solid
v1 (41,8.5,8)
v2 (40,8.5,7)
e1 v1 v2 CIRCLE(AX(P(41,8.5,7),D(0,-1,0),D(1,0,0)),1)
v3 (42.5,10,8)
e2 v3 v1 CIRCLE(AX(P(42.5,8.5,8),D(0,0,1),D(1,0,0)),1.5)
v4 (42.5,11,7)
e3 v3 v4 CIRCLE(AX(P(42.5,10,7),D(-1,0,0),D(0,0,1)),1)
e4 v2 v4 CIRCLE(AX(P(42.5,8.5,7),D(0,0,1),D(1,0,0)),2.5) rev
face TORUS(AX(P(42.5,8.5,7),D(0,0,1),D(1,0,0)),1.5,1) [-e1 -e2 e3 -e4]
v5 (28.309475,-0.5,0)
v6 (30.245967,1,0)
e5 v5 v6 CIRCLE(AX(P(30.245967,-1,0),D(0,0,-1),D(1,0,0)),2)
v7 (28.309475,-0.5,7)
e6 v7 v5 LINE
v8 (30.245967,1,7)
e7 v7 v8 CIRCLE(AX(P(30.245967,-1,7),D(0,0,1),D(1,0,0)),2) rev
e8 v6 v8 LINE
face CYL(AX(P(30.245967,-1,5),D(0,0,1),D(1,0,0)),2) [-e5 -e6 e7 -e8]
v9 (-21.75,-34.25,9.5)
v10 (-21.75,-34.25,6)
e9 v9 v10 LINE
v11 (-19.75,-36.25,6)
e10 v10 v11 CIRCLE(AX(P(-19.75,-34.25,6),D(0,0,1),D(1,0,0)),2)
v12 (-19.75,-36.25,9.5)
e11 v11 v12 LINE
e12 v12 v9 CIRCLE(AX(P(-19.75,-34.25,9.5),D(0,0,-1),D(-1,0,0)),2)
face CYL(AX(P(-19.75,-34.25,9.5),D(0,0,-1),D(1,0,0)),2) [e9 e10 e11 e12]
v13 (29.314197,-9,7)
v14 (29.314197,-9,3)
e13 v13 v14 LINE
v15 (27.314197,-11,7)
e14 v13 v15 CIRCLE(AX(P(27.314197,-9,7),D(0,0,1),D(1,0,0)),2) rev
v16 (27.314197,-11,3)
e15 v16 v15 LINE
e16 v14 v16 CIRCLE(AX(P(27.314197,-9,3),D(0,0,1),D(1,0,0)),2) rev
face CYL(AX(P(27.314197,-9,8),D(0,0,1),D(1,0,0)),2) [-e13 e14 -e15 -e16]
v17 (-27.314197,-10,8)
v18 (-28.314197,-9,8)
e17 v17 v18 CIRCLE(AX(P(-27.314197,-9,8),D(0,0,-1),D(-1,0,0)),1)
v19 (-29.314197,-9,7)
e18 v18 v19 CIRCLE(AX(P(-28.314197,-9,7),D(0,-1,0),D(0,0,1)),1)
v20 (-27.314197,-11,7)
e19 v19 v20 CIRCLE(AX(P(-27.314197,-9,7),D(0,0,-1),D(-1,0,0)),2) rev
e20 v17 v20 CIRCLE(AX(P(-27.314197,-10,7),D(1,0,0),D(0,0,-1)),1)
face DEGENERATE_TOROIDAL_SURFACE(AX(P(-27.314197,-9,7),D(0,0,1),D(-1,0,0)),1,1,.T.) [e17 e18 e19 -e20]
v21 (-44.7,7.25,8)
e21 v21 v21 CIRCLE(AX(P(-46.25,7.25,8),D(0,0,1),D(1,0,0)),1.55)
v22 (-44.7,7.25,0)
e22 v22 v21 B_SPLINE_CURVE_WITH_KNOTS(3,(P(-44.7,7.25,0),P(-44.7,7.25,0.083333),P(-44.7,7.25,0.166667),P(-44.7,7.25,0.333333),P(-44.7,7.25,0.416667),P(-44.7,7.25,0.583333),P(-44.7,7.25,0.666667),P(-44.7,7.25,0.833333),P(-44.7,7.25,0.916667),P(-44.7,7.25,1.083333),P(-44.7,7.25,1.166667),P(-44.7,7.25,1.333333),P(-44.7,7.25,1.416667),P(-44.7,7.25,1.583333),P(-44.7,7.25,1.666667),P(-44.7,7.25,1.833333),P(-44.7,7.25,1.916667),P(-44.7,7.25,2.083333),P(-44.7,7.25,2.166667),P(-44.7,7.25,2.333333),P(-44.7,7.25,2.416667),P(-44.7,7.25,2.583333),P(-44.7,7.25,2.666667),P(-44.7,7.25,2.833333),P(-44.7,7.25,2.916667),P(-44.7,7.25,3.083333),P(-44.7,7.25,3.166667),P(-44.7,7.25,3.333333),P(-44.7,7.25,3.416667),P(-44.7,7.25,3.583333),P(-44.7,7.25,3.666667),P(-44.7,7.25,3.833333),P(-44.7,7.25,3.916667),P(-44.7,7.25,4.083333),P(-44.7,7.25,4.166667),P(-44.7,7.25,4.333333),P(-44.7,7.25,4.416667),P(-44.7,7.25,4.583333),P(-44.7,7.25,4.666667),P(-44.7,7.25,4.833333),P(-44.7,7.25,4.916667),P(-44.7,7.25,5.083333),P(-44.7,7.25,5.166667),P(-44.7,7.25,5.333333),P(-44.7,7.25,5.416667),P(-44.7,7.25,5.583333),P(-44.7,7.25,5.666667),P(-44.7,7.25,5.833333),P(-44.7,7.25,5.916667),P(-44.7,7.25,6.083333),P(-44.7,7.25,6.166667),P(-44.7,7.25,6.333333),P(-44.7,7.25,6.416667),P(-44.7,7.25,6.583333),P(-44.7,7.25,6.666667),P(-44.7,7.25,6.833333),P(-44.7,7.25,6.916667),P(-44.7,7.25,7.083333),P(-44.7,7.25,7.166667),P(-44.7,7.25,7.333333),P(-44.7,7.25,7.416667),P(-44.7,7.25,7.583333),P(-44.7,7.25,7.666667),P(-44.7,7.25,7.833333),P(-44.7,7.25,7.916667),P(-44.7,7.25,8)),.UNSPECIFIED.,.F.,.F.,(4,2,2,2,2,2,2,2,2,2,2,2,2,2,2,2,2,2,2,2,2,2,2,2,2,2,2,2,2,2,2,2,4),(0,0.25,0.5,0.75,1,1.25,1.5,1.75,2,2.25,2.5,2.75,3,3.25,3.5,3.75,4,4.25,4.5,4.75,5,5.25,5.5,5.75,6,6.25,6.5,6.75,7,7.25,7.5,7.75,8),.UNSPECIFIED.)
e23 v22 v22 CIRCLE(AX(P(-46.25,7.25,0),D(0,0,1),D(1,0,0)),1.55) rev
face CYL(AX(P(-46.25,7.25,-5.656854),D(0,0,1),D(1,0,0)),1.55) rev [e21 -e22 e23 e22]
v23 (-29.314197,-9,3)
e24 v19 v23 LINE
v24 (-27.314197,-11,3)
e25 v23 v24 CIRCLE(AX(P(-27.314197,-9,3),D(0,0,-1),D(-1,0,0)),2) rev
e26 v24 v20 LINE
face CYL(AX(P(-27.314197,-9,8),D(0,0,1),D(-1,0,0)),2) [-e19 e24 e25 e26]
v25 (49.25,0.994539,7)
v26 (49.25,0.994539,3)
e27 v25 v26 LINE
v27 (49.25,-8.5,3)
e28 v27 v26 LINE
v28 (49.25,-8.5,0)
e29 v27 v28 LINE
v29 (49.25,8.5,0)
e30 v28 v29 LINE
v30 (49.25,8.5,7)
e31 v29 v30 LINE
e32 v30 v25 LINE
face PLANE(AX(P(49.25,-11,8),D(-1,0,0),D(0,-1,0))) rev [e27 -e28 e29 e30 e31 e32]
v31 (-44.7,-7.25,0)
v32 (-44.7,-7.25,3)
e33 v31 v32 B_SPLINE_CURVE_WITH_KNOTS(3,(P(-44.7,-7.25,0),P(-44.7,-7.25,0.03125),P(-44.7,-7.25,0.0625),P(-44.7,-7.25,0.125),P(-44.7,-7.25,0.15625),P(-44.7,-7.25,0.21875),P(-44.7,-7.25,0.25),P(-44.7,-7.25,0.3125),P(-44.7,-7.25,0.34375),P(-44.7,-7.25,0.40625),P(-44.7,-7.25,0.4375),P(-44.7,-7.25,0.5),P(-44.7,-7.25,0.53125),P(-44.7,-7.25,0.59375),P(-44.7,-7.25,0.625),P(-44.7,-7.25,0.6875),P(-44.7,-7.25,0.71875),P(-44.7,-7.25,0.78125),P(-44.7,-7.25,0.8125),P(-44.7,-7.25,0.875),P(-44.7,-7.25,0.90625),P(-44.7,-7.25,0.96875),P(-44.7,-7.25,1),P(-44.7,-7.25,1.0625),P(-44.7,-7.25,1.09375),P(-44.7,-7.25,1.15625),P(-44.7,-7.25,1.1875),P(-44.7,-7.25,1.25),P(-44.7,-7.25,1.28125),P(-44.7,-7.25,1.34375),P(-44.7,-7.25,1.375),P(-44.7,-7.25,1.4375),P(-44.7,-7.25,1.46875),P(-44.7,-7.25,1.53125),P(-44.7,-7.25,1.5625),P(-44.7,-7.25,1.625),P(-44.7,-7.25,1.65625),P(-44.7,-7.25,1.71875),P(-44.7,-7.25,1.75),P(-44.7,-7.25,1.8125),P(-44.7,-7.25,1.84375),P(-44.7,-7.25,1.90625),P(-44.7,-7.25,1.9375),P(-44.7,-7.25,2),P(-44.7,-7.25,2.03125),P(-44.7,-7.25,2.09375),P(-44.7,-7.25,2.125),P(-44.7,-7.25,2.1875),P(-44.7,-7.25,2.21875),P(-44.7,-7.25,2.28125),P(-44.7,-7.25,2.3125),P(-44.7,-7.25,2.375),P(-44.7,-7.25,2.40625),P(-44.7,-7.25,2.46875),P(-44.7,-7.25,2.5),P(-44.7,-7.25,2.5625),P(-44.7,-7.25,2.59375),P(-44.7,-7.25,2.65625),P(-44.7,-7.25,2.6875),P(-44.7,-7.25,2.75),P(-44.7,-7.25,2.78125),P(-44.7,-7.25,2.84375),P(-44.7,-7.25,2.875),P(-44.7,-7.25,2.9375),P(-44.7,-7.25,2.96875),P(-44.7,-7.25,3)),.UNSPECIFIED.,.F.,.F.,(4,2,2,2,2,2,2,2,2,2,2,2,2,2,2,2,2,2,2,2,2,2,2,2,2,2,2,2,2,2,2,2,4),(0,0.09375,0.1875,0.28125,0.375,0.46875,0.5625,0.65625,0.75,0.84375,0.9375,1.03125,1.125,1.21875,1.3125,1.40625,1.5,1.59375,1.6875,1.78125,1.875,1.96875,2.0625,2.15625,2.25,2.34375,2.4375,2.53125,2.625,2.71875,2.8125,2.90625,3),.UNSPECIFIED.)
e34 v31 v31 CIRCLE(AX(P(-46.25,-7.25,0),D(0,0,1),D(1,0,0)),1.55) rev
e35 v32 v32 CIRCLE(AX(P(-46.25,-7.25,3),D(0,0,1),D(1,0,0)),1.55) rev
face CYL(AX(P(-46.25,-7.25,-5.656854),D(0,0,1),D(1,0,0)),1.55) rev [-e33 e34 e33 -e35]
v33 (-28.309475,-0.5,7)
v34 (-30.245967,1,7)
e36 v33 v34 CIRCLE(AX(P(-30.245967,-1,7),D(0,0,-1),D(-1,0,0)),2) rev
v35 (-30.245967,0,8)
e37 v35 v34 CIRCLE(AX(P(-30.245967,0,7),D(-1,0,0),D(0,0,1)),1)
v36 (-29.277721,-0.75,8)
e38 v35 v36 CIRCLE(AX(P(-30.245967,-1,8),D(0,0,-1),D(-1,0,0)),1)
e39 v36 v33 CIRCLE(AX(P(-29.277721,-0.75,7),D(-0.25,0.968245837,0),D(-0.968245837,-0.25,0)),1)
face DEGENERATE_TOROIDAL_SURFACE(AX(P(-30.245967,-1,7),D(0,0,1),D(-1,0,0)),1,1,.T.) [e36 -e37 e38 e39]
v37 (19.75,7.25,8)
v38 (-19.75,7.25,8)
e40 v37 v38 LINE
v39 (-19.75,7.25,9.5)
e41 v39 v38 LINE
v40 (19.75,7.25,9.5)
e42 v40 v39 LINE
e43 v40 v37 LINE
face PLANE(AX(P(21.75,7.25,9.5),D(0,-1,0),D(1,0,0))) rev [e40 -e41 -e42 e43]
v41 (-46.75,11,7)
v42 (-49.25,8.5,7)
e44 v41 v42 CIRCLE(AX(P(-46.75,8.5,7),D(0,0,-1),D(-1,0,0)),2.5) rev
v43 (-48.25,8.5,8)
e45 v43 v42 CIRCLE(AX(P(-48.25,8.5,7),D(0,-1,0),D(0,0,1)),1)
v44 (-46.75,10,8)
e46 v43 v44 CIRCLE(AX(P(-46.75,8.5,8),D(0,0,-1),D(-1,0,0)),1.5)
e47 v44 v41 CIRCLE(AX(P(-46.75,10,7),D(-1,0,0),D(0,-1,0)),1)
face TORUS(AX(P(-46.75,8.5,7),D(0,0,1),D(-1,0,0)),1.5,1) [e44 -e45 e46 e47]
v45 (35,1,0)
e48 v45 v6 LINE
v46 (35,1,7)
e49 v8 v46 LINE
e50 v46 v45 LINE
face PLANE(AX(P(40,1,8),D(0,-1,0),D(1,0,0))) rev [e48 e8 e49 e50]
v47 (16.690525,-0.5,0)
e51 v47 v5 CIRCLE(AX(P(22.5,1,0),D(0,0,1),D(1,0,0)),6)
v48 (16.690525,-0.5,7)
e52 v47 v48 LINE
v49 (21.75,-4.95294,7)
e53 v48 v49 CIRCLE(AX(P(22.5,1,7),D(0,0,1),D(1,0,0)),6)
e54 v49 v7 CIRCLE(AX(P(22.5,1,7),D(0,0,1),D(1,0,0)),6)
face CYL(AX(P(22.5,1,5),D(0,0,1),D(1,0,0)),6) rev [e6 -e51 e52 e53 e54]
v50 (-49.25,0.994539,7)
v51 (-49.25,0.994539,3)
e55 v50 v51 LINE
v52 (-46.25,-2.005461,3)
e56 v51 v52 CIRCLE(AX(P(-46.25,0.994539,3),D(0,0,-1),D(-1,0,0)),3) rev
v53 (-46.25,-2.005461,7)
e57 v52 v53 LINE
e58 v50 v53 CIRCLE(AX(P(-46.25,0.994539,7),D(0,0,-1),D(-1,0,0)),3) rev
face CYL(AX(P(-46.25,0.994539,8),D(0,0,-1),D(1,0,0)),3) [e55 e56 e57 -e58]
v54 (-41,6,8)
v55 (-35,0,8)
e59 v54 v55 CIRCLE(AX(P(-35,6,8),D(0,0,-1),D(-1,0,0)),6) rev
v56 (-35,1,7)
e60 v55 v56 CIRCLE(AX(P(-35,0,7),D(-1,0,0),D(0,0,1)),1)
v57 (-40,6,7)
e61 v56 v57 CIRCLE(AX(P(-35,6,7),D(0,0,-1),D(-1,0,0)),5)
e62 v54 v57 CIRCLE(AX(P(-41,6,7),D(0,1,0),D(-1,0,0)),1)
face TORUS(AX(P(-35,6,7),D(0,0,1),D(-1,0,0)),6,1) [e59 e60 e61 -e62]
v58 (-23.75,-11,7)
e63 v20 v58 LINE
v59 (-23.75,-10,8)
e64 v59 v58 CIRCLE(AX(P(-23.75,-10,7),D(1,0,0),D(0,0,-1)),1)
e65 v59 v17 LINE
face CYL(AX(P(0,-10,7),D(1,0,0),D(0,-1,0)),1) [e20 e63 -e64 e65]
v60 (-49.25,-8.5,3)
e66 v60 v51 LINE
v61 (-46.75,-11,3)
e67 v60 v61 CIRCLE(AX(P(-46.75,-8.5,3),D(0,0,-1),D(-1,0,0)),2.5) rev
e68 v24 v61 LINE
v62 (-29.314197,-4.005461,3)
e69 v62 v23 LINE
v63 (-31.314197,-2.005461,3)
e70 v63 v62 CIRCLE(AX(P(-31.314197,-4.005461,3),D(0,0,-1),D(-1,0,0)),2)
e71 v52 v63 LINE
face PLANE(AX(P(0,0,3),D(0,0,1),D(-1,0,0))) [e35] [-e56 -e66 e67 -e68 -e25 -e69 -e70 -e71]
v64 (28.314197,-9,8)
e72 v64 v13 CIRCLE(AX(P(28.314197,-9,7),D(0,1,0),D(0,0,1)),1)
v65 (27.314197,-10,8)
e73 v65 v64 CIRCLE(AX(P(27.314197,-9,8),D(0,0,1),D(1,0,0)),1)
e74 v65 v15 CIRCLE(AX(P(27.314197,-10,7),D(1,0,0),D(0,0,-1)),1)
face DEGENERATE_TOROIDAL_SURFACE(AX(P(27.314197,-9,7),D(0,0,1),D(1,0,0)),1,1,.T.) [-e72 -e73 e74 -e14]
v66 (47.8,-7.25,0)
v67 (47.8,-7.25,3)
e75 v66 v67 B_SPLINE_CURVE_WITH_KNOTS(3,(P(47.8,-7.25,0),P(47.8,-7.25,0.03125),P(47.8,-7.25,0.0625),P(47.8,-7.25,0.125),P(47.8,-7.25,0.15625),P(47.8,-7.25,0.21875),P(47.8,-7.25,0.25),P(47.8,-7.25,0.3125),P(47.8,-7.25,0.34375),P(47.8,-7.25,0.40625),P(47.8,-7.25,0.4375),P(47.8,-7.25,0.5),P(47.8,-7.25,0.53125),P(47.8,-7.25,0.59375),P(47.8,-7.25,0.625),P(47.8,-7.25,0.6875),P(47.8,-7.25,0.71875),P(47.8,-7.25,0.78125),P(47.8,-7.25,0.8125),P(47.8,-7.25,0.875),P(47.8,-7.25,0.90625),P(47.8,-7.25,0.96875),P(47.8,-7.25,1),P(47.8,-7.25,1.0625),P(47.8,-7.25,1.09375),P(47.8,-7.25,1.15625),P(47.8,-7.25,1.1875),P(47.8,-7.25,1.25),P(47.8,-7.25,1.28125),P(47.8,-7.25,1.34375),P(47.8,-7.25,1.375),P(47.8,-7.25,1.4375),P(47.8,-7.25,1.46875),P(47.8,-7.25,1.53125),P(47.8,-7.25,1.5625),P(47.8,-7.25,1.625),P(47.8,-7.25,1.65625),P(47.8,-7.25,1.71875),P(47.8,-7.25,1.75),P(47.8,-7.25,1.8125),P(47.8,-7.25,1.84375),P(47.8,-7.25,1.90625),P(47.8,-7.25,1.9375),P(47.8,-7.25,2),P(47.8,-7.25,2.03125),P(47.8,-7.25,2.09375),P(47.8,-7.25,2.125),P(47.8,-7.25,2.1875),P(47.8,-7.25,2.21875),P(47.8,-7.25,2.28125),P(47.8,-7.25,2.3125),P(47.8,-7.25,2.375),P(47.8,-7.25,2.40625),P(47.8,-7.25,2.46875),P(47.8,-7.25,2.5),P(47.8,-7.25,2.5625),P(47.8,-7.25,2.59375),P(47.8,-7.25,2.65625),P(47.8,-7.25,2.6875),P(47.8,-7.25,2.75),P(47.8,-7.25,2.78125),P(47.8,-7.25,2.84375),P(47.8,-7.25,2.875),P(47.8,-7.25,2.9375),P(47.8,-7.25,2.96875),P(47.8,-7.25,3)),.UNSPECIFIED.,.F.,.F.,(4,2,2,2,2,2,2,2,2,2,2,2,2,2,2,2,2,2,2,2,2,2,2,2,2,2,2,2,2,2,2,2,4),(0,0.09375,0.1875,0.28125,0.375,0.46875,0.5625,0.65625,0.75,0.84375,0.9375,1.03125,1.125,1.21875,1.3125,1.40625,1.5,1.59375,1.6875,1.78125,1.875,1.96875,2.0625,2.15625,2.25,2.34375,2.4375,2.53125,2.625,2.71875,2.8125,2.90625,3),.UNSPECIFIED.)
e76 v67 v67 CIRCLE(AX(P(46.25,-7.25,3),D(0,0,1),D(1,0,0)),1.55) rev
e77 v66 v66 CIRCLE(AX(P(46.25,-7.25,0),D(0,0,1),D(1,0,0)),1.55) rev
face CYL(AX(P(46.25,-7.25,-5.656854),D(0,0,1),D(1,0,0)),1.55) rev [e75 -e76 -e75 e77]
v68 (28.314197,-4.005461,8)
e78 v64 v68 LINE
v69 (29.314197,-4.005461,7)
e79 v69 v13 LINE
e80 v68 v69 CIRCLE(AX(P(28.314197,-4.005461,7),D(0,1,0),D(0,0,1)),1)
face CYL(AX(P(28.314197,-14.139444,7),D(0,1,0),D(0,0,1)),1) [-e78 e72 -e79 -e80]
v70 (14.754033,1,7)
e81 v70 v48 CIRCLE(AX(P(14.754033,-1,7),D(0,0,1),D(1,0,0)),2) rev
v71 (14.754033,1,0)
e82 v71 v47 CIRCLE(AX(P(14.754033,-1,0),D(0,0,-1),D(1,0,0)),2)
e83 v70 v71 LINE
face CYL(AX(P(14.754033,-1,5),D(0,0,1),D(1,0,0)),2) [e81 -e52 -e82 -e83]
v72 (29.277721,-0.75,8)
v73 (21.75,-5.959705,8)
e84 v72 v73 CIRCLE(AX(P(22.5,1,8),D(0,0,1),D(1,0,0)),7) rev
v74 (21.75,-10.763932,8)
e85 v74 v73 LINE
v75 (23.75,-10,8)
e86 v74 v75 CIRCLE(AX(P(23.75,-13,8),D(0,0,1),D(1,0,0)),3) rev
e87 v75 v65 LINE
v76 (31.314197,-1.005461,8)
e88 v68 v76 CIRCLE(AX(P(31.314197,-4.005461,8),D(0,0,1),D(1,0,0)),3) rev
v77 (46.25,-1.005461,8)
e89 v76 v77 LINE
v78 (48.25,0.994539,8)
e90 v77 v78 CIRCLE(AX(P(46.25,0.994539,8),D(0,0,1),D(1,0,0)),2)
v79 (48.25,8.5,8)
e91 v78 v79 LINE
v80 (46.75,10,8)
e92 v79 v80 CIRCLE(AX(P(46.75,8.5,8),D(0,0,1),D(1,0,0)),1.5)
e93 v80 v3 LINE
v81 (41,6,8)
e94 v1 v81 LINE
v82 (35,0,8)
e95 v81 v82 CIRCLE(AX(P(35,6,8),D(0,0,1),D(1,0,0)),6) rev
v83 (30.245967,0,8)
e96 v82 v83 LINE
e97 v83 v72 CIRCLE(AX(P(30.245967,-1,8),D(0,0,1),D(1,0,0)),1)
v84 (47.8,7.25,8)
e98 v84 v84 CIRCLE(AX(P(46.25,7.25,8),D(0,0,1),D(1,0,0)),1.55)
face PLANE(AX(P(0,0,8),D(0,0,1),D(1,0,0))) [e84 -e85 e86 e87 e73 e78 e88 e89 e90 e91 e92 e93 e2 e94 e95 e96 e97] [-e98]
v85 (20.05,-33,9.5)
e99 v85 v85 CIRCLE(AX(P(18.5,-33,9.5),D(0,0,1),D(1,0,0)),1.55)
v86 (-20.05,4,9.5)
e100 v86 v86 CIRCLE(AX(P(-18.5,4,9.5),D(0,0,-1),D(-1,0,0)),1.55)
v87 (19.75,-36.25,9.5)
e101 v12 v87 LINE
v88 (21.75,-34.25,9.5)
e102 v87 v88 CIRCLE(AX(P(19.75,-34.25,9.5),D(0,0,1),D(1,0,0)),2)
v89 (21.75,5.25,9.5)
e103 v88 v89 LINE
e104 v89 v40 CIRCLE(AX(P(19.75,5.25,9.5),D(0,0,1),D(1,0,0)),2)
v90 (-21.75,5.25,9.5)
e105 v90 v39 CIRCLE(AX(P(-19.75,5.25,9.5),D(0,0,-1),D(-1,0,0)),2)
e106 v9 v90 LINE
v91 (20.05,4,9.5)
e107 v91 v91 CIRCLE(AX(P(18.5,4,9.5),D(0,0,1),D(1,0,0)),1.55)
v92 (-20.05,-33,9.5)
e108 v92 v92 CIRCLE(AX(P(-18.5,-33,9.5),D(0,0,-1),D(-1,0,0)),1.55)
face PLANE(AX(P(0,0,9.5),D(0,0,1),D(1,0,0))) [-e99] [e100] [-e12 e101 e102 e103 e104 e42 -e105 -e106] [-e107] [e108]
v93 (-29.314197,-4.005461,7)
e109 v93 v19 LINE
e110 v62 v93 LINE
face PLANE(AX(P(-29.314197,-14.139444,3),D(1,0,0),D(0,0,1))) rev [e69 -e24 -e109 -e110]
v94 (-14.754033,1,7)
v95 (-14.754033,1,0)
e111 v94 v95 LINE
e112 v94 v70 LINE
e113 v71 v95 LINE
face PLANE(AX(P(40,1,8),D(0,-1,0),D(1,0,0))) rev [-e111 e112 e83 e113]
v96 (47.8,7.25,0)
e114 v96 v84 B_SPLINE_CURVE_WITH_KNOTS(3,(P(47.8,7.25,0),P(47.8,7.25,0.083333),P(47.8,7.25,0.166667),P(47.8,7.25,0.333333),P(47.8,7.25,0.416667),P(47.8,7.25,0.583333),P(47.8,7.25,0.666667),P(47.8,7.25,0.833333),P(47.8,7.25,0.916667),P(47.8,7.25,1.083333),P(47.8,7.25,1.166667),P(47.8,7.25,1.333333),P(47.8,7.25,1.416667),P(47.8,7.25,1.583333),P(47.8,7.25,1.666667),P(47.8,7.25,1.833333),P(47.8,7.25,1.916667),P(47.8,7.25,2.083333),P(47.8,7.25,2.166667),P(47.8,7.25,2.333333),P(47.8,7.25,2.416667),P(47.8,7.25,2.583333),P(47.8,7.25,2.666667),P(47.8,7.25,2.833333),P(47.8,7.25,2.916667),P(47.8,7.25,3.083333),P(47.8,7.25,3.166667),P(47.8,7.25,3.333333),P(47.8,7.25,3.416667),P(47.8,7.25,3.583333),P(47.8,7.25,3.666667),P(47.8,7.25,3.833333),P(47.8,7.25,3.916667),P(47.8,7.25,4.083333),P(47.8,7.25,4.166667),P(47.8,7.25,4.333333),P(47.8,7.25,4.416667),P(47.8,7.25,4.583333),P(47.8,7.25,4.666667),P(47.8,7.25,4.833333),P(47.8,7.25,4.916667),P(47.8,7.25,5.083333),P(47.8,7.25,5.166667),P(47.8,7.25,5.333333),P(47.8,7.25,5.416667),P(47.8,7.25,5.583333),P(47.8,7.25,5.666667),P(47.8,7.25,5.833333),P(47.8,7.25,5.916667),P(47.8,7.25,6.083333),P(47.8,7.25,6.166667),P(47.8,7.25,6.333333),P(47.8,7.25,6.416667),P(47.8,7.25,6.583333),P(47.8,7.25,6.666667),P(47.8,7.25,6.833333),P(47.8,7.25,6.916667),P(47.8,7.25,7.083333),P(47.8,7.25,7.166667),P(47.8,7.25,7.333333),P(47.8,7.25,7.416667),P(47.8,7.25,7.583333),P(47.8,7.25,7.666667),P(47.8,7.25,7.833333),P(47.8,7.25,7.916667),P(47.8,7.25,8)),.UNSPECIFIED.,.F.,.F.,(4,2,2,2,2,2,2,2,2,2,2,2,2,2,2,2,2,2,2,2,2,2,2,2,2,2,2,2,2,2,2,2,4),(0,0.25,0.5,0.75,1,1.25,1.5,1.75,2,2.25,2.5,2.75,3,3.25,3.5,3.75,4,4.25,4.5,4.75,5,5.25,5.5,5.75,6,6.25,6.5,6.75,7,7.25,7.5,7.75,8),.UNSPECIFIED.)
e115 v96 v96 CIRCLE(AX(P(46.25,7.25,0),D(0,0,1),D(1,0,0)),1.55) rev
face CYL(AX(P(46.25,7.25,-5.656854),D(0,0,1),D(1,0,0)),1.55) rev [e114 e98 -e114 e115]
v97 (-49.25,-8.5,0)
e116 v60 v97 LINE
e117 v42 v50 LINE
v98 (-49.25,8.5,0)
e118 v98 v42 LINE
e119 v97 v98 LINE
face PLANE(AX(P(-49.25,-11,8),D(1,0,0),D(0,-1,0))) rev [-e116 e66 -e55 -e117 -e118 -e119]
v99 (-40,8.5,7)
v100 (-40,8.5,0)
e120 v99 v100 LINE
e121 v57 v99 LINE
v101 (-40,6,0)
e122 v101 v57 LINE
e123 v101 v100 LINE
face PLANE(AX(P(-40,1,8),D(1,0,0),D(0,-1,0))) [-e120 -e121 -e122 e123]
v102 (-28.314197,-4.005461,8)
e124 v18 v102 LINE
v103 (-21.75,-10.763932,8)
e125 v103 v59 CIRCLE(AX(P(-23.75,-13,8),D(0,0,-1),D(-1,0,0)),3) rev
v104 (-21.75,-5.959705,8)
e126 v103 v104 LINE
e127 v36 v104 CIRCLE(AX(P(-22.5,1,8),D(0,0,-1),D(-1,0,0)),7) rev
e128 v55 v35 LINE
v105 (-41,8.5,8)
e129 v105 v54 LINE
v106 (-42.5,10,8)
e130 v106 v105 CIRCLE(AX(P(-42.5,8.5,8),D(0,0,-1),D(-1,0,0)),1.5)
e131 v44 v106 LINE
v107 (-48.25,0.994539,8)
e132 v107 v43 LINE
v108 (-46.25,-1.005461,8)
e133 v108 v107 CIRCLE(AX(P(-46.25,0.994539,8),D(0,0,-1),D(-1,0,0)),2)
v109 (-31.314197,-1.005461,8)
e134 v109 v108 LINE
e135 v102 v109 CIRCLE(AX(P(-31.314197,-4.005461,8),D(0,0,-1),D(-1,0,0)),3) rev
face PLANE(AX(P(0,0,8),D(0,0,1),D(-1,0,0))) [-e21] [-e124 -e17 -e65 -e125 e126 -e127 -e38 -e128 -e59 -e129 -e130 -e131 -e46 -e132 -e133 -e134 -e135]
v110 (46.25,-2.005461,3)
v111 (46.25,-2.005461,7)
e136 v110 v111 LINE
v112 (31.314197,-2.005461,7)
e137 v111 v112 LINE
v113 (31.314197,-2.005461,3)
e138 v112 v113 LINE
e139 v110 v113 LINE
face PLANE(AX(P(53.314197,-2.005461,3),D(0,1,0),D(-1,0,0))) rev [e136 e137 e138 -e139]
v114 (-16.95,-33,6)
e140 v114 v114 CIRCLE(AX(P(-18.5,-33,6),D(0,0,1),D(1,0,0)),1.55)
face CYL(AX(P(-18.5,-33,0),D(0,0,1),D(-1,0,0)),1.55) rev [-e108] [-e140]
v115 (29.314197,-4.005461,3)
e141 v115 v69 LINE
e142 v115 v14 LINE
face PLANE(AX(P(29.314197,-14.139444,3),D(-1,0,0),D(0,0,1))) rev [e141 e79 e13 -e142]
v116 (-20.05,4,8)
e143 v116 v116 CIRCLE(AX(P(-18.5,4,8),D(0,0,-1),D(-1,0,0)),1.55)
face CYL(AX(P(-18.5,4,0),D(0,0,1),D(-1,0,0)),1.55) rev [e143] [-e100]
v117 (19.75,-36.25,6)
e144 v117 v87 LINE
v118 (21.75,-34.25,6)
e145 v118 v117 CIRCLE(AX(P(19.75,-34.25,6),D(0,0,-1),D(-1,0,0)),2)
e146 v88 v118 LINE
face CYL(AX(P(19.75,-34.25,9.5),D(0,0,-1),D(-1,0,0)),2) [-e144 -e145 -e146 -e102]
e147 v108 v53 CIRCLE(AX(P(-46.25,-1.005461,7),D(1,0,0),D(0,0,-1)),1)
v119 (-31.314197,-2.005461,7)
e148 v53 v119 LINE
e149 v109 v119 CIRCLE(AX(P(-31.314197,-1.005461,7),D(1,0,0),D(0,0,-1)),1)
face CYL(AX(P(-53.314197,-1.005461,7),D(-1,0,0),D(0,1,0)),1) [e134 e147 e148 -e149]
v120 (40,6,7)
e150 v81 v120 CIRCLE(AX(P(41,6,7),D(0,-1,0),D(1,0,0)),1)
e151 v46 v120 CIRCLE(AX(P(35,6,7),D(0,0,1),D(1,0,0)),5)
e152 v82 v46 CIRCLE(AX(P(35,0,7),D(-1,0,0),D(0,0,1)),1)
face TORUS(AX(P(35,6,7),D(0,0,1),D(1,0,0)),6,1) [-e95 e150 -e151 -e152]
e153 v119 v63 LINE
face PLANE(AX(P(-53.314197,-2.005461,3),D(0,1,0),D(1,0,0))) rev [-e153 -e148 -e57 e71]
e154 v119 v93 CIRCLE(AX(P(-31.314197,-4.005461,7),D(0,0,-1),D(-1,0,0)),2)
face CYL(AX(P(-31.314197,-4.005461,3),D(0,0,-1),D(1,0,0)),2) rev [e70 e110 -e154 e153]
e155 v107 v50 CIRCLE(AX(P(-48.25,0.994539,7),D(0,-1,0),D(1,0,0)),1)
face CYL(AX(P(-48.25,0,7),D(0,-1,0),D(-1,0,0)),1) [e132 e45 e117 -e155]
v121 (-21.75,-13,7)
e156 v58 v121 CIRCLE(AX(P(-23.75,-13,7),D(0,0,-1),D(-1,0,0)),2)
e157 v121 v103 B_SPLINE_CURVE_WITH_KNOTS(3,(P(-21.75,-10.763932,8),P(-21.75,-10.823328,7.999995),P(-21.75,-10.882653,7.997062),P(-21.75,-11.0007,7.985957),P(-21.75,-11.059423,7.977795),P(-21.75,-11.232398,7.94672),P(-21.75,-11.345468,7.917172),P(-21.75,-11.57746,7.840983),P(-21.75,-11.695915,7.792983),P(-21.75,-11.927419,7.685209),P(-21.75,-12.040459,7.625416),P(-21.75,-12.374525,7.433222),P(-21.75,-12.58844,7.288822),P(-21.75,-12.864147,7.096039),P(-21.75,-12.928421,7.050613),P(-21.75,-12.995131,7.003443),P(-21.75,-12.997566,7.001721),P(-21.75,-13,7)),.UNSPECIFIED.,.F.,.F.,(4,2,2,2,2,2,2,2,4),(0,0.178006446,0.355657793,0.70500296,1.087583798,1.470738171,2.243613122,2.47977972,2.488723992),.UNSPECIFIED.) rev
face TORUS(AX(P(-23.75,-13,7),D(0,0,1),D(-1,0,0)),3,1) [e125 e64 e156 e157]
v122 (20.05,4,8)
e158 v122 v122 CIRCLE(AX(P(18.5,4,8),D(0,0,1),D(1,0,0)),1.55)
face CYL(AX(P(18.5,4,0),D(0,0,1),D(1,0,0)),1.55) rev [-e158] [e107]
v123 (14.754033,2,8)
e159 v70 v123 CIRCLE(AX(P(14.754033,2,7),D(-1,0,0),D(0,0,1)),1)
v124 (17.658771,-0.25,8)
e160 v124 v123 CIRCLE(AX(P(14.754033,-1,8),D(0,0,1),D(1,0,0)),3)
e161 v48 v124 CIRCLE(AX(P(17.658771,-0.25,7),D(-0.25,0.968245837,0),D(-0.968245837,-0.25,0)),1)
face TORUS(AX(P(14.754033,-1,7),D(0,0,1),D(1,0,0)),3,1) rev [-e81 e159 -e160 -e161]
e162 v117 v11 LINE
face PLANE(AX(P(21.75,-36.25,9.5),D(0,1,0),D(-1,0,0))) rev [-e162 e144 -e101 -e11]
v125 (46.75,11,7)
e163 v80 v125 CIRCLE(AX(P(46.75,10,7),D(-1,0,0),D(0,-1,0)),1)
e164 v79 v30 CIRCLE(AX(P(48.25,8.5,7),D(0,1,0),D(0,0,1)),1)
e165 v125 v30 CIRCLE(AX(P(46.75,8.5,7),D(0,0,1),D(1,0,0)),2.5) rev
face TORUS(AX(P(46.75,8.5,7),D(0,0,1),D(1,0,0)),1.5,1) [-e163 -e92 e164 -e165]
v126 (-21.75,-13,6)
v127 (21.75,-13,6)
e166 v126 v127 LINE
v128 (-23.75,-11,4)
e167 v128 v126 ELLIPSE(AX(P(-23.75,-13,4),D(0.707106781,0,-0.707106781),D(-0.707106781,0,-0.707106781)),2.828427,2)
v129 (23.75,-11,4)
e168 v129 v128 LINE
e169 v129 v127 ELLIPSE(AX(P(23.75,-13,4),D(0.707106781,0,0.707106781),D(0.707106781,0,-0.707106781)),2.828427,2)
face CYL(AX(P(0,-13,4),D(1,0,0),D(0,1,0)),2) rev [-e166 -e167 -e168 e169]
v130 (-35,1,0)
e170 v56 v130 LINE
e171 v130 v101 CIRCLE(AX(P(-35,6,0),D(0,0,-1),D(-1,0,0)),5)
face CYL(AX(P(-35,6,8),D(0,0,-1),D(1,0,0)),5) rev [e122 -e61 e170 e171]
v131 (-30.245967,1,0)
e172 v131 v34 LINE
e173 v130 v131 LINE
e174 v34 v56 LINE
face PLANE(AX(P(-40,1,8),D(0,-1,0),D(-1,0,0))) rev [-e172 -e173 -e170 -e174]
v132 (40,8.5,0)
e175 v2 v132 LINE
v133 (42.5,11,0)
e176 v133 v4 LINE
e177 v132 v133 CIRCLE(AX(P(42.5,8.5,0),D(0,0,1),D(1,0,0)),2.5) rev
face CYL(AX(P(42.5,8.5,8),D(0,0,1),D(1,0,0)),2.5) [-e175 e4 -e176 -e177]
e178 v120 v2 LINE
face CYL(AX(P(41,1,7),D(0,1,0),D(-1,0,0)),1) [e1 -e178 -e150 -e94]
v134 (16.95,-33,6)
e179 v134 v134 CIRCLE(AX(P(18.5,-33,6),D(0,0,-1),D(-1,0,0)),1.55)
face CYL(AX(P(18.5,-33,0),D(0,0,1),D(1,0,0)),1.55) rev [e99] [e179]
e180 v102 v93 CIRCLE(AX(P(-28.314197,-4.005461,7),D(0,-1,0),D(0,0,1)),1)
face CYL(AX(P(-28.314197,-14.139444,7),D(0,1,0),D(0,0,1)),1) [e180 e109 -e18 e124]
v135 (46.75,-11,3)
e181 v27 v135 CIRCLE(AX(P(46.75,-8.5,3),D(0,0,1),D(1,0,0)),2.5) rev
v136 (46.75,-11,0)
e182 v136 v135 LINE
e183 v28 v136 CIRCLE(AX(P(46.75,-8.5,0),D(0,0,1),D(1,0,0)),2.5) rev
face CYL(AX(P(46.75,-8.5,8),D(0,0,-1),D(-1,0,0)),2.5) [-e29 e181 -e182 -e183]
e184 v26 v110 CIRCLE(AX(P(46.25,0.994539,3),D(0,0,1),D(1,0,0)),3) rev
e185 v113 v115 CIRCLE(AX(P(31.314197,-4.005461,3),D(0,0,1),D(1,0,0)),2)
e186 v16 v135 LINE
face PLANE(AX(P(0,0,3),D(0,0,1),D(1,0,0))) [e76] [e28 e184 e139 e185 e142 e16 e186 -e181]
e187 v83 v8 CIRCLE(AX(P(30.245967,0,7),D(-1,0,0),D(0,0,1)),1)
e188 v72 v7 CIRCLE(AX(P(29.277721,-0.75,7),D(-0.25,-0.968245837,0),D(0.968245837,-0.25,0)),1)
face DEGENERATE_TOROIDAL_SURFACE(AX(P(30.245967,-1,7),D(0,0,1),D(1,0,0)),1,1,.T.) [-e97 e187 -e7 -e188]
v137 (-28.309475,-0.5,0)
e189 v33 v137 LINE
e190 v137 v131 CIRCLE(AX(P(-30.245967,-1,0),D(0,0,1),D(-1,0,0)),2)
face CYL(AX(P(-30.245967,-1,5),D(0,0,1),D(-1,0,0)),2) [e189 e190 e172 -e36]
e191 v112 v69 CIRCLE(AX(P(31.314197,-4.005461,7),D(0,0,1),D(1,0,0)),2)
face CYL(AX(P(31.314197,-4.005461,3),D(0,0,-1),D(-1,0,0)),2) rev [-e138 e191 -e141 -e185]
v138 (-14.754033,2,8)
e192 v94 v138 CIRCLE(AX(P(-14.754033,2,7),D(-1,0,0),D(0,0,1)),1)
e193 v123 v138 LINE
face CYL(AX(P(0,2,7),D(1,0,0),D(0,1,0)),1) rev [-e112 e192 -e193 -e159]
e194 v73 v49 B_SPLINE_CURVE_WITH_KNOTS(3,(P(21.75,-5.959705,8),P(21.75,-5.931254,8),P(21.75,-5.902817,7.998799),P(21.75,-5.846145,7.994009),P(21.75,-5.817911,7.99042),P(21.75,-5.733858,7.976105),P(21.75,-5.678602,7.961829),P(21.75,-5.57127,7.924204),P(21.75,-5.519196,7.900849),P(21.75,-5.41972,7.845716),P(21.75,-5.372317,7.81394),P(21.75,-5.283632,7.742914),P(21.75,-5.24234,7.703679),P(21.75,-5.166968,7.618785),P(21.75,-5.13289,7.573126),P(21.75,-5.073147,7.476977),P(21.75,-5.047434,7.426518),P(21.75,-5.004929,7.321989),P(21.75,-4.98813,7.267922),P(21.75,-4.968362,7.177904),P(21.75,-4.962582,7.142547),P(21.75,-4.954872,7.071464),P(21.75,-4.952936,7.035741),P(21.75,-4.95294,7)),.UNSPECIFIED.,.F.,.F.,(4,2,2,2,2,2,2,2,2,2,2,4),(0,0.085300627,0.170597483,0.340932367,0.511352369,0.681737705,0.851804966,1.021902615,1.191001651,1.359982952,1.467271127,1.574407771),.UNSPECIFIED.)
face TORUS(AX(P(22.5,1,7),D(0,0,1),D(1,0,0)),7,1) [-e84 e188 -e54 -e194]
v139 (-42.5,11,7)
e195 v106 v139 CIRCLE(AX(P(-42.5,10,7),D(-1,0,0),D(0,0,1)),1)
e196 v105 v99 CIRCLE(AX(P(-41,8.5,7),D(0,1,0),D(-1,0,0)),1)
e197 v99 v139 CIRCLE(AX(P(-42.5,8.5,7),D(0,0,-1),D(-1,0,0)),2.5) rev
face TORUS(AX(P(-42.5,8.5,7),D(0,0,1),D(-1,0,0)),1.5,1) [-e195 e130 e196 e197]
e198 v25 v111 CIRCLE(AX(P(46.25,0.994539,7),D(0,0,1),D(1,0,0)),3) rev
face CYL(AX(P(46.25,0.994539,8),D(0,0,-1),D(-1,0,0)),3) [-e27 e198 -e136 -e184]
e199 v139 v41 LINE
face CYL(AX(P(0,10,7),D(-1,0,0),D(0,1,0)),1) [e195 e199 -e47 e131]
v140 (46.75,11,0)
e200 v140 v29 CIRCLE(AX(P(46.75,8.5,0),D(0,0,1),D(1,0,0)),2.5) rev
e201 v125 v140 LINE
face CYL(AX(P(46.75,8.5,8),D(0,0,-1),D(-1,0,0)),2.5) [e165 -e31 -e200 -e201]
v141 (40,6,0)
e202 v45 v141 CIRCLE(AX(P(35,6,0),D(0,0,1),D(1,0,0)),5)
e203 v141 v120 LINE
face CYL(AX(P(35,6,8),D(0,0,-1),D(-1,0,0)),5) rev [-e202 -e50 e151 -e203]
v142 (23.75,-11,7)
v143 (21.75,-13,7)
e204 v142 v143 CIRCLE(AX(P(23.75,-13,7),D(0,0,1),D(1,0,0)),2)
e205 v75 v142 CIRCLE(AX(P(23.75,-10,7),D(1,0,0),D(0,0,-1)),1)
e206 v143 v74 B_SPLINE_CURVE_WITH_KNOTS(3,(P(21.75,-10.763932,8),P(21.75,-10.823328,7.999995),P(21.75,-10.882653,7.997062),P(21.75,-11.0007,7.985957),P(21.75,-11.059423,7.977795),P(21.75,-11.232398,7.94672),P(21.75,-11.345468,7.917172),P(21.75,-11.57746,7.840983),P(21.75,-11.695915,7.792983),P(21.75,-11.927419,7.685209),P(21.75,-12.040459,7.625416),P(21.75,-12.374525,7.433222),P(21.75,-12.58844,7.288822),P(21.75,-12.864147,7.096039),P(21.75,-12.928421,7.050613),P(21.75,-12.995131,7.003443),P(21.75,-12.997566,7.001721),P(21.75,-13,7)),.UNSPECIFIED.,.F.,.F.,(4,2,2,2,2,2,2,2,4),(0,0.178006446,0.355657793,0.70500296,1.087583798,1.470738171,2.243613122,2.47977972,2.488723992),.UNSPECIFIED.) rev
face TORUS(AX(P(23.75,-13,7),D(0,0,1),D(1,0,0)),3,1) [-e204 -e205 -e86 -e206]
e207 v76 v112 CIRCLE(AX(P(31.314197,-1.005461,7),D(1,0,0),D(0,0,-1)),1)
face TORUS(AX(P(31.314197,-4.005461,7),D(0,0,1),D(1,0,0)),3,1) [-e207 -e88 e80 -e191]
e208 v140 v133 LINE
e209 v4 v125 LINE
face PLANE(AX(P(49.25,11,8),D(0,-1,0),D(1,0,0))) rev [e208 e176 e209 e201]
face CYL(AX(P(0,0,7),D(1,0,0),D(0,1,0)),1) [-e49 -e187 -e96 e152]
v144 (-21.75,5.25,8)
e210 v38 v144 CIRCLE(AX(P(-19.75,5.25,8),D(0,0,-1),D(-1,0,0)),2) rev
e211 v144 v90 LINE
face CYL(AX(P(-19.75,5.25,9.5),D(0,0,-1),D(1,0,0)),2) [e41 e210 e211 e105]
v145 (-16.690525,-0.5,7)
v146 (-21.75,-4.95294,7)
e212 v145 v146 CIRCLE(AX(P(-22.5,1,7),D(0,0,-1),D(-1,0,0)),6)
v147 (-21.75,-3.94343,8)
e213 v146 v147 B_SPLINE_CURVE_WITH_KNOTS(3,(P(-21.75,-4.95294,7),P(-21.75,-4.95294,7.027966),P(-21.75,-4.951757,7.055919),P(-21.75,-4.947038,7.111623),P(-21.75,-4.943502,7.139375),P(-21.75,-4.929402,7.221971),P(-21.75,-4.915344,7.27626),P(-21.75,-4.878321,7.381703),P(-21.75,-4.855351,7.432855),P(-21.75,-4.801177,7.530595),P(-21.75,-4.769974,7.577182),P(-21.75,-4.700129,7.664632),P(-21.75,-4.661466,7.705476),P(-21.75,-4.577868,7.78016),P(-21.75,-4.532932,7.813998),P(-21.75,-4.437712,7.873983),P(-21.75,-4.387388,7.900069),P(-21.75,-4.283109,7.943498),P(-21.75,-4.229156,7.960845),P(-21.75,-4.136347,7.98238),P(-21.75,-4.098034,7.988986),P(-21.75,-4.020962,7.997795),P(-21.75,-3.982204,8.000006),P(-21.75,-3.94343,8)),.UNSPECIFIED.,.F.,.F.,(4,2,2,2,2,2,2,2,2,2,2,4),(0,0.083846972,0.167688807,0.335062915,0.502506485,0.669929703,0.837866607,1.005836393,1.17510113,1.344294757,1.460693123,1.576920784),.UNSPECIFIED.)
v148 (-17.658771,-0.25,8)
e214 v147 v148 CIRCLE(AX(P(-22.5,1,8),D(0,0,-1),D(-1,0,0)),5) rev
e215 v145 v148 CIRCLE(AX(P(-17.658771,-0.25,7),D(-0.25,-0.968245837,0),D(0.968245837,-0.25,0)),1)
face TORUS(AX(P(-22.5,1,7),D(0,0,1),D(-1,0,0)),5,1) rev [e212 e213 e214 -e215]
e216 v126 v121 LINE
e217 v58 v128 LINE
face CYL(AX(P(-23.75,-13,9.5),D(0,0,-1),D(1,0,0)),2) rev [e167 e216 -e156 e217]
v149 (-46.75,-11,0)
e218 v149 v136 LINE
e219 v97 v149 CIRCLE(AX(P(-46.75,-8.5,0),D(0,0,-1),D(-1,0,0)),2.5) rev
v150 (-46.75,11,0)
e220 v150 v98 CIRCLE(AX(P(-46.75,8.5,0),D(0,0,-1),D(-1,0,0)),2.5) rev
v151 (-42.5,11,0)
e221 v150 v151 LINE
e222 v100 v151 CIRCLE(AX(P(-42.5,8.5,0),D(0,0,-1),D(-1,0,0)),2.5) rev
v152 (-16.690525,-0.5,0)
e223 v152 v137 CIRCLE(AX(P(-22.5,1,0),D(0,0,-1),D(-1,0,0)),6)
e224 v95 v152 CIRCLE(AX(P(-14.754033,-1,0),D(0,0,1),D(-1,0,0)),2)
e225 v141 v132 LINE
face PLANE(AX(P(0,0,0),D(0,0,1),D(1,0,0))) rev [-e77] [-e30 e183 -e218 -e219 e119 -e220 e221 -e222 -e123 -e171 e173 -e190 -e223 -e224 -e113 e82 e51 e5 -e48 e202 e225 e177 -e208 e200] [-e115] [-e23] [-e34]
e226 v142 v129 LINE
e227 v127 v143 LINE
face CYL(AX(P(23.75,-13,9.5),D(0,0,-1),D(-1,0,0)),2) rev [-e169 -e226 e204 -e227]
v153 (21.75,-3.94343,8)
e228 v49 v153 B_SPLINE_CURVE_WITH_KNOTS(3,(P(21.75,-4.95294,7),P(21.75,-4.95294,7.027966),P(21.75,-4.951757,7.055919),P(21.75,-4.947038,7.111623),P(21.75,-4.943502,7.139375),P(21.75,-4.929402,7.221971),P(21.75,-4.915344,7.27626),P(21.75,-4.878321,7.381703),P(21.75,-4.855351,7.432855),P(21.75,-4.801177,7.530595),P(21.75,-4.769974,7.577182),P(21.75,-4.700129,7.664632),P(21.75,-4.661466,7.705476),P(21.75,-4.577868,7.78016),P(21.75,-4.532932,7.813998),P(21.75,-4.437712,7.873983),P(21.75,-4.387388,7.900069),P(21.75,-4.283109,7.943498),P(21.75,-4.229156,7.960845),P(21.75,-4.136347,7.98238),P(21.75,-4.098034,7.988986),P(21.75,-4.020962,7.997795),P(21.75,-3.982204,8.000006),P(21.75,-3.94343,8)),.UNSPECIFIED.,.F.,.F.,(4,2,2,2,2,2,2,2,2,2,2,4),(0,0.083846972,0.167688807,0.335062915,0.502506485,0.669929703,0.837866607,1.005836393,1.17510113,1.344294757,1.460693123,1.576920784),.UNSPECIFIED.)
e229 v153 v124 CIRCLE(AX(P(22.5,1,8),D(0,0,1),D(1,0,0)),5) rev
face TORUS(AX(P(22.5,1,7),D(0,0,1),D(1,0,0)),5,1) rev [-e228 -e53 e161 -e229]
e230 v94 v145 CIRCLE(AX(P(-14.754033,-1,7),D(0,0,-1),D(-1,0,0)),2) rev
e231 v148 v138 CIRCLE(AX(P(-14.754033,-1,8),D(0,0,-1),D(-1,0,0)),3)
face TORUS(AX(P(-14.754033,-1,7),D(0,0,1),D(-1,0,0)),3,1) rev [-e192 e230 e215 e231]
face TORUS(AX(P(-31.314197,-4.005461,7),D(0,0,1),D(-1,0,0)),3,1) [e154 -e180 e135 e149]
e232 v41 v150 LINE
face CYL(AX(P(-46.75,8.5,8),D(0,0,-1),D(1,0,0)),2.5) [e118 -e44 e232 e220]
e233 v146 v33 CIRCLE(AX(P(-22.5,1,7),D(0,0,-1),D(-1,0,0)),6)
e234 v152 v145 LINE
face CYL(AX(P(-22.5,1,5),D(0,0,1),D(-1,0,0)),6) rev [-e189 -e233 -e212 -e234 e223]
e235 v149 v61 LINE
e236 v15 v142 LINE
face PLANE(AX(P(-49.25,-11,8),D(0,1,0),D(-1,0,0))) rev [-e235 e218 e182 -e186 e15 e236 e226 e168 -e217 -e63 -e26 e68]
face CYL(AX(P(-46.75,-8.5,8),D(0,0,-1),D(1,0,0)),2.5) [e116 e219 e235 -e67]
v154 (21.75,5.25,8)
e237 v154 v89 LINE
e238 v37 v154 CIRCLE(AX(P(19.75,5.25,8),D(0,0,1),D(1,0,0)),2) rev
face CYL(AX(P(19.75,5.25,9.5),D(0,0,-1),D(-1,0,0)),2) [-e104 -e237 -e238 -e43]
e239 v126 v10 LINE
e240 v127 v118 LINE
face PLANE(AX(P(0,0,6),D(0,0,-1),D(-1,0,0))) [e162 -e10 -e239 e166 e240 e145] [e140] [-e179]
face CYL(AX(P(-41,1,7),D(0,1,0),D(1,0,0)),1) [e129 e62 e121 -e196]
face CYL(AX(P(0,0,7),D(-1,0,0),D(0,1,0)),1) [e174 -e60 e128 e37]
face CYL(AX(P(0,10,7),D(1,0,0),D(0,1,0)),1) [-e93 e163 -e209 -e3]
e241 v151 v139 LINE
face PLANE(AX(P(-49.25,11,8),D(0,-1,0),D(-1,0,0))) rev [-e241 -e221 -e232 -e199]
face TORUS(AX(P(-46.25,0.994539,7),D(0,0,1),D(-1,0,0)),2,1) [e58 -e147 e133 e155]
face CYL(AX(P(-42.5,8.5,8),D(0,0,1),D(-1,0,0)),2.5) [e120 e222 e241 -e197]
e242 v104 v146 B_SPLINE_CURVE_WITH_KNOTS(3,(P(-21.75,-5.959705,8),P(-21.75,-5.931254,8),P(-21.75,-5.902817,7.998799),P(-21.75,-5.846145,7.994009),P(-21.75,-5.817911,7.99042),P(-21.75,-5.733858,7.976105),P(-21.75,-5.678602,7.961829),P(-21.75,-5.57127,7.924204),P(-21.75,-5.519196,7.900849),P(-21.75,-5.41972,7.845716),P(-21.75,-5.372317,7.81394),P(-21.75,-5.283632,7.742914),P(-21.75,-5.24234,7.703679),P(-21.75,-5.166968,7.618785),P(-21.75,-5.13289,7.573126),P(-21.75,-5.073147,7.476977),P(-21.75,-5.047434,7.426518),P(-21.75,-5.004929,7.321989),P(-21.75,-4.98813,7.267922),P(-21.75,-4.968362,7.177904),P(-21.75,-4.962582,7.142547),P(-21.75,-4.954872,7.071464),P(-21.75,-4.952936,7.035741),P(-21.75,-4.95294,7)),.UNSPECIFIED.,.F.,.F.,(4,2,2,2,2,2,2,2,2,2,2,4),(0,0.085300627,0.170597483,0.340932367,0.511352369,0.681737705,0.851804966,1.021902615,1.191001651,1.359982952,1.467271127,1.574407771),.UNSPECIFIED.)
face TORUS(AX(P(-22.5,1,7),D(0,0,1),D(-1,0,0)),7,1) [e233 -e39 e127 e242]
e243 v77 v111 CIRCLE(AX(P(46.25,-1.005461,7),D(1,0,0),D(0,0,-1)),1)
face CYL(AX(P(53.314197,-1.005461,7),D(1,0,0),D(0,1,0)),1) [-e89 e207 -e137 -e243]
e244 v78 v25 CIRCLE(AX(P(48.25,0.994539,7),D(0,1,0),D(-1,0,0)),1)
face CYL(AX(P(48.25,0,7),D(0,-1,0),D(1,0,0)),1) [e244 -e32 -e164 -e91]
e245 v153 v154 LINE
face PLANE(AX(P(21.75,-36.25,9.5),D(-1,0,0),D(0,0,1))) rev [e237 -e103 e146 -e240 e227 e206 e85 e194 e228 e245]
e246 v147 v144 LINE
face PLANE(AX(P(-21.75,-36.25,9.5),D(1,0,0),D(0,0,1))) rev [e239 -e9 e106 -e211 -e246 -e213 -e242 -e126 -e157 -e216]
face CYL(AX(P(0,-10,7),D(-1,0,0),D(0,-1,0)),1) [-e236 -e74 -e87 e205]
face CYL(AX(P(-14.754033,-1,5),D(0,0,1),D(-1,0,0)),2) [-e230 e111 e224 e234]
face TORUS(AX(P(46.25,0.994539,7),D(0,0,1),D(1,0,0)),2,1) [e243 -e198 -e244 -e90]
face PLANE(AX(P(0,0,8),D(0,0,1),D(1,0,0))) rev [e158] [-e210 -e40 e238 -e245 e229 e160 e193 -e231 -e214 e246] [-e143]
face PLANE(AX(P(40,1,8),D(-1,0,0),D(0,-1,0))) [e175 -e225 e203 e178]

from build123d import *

# Parameters (mm, degrees)
SKETCH2_R               = 2
BOSS_EXTRUDE1_DEPTH     = 8
FILLET1_R               = 2.5
FILLET2_R               = 2.5
FILLET3_R               = 5
SKETCH4_R               = 6
CUT_EXTRUDE1_DEPTH      = 3
FILLET4_R               = 2
SKETCH6_W               = 43.5
SKETCH6_H               = 43.5
BOSS_EXTRUDE2_DEPTH     = 1.5
CUT_EXTRUDE2_DEPTH      = 62.356539994
SKETCH7_R               = 1.55
CUT_EXTRUDE3_DEPTH      = 62.885983874
SKETCH9_W               = 43.5
SKETCH9_H               = 25.25
SKETCH9_R               = 1.55
BOSS_EXTRUDE3_DEPTH     = 2
FILLET5_R               = 2
SKETCH11_W              = 24
SKETCH11_H              = 12.133982922
CUT_EXTRUDE4_DEPTH      = 5
FILLET6_R               = 2
FILLET7_R               = 3
FILLET8_R               = 1
FILLET9_R               = 2
FILLET11_R              = 1
CUT_EXTRUDE5_DEPTH      = 62.885983932
CUT_EXTRUDE5_DEPTH_BACK = 62.885983932
BOSS_EXTRUDE4_START     = -8
SKETCH14_R              = 2
SKETCH14_R_2            = 1.55
BOSS_EXTRUDE4_DEPTH     = 8
SKETCH15_W              = 25.857004487
SKETCH15_H              = 16.199569076
SKETCH15_W_2            = 17.341846383
SKETCH15_H_2            = 17.1341596
CUT_EXTRUDE6_DEPTH      = 62.496951155


with BuildPart() as part:
    # Sketch2 → Boss-Extrude1 (new body)
    with BuildSketch(Plane.XY):
        Polygon((-49.25, -11), (49.25, -11), (49.25, 11), (40, 11), (40, 1), (-40, 1), (-40, 11), (-49.25, 11), align=None)
        with Locations((-46.25, 7.25)):
            Circle(SKETCH2_R, mode=Mode.SUBTRACT)
        with Locations((-46.25, -7.25)):
            Circle(SKETCH2_R, mode=Mode.SUBTRACT)
        with Locations(Location((46.25, 7.25, 0), (0, 0, 180))):
            Circle(SKETCH2_R, mode=Mode.SUBTRACT)
        with Locations(Location((46.25, -7.25, 0), (0, 0, 180))):
            Circle(SKETCH2_R, mode=Mode.SUBTRACT)
    extrude(amount=BOSS_EXTRUDE1_DEPTH)

    # Fillet1
    fillet1_edges = [part.edges().sort_by_distance(p)[0] for p in [
        (-49.25, -11, 4),
        (-49.25, 11, 4),
        (49.25, 11, 4),
        (49.25, -11, 4),
    ]]
    fillet(fillet1_edges, radius=FILLET1_R)

    # Fillet2
    fillet2_edges = [part.edges().sort_by_distance(p)[0] for p in [
        (-40, 11, 4),
        (40, 11, 4),
    ]]
    fillet(fillet2_edges, radius=FILLET2_R)

    # Fillet3
    fillet3_edges = [part.edges().sort_by_distance(p)[0] for p in [
        (-40, 1, 4),
        (40, 1, 4),
    ]]
    fillet(fillet3_edges, radius=FILLET3_R)

    # Sketch4 → Cut-Extrude1 (cut)
    with BuildSketch(Plane.XY.offset(8)):
        with Locations((-22.5, 1)):
            Circle(SKETCH4_R)
        with Locations((22.5, 1)):
            Circle(SKETCH4_R)
    extrude(amount=-CUT_EXTRUDE1_DEPTH, mode=Mode.SUBTRACT)

    # Fillet4
    fillet4_edges = [part.edges().sort_by_distance(p)[0] for p in [
        (28.5, 1, 6.5),
        (-28.5, 1, 6.5),
        (-16.5, 1, 6.5),
        (16.5, 1, 6.5),
    ]]
    fillet(fillet4_edges, radius=FILLET4_R)

    # Sketch6 → Boss-Extrude2 (add)
    with BuildSketch(Plane.XY.offset(8)):
        with Locations((0, -14.5)):
            Rectangle(SKETCH6_W, SKETCH6_H)
    extrude(amount=BOSS_EXTRUDE2_DEPTH)

    # Sketch8 → Cut-Extrude2 (cut, through all)
    with BuildSketch(Plane.XY.offset(5)):
        with BuildLine():
            Line((30.245966692, 1), (14.754033308, 1))
            ThreePointArc((14.754033308, 1), (15.978778179, 0.58113883), (16.690524981, -0.5))
            ThreePointArc((16.690524981, -0.5), (22.5, -5), (28.309475019, -0.5))
            ThreePointArc((28.309475019, -0.5), (29.021221821, 0.58113883), (30.245966692, 1))
        make_face()
        with BuildLine():
            Line((-14.754033308, 1), (-30.245966692, 1))
            ThreePointArc((-30.245966692, 1), (-29.021221821, 0.58113883), (-28.309475019, -0.5))
            ThreePointArc((-28.309475019, -0.5), (-22.5, -5), (-16.690524981, -0.5))
            ThreePointArc((-16.690524981, -0.5), (-15.978778179, 0.58113883), (-14.754033308, 1))
        make_face()
    extrude(amount=-CUT_EXTRUDE2_DEPTH, mode=Mode.SUBTRACT)

    # Sketch7 → Cut-Extrude3 (cut, through all)
    with BuildSketch(Plane.XY.offset(9.5)):
        with Locations((-18.5, 4)):
            Circle(SKETCH7_R)
        with Locations((18.5, 4)):
            Circle(SKETCH7_R)
        with Locations((18.5, -33)):
            Circle(SKETCH7_R)
        with Locations((-18.5, -33)):
            Circle(SKETCH7_R)
    extrude(amount=-CUT_EXTRUDE3_DEPTH, mode=Mode.SUBTRACT)

    # Sketch9 → Boss-Extrude3 (add)
    with BuildSketch(Plane(origin=(0, 0, 8), x_dir=(-1, 0, 0), z_dir=(0, 0, -1))):
        with Locations((0, -23.625)):
            Rectangle(SKETCH9_W, SKETCH9_H)
        with Locations(Location((18.5, -33, 0), (0, 0, 180))):
            Circle(SKETCH9_R, mode=Mode.SUBTRACT)
        with Locations(Location((-18.5, -33, 0), (0, 0, 180))):
            Circle(SKETCH9_R, mode=Mode.SUBTRACT)
    extrude(amount=BOSS_EXTRUDE3_DEPTH)

    # Fillet5
    fillet5_edges = [part.edges().sort_by_distance(p)[0] for p in [
        (0, -11, 6),
        (-21.75, -11, 7),
        (21.75, -11, 7),
    ]]
    fillet(fillet5_edges, radius=FILLET5_R)

    # Sketch11 → Cut-Extrude4 (cut)
    with BuildSketch(Plane.XY.offset(8)):
        with Locations((41.314196824, -8.07245273)):
            Rectangle(SKETCH11_W, SKETCH11_H)
    extrude(amount=-CUT_EXTRUDE4_DEPTH, mode=Mode.SUBTRACT)

    # Fillet6
    fillet6_edges = [part.edges().sort_by_distance(p)[0] for p in [
        (29.314196824, -11, 5.5),
        (29.314196824, -2.005461269, 5.5),
    ]]
    fillet(fillet6_edges, radius=FILLET6_R)

    # Fillet7
    fillet7_edges = [part.edges().sort_by_distance(p)[0] for p in [
        (49.25, -2.005461269, 5.5),
    ]]
    fillet(fillet7_edges, radius=FILLET7_R)

    # Fillet8
    fillet8_edges = [part.edges().sort_by_distance(p)[0] for p in [
        (29.021221821, 0.58113883, 8),
        (25.869976488, -3.964197666, 8),
        (25.532098412, -11, 8),
        (22.335786438, -11.585786438, 8),
        (29.314196824, -6.502730634, 8),
        (28.728410386, -10.414213562, 8),
        (29.899983262, -2.591247706, 8),
        (49.25, 4.747269366, 8),
        (38.782098412, -2.005461269, 8),
        (48.371320344, -1.126781612, 8),
        (44.625, 11, 8),
        (48.517766953, 10.267766953, 8),
        (40.732233047, 10.267766953, 8),
        (32.622983346, 1, 8),
        (40, 7.25, 8),
        (38.535533906, 2.464466094, 8),
    ]]
    fillet(fillet8_edges, radius=FILLET8_R - 0.0001)  # a hair under: the kernel refuses the full size

    # Fillet9
    fillet9_edges = [part.edges().sort_by_distance(p)[0] for p in [
        (21.75, -36.25, 7.75),
        (21.75, 7.25, 8.75),
    ]]
    fillet(fillet9_edges, radius=FILLET9_R)

    # Fillet11
    fillet11_edges = [part.edges().sort_by_distance(p)[0] for p in [
        (18.5359304, -3.50401512, 8),
        (15.978778179, 0.58113883, 8),
        (-18.5359304, -3.50401512, 8),
        (-15.978778179, 0.58113883, 8),
        (0, 1, 8),
    ]]
    fillet(fillet11_edges, radius=FILLET11_R - 0.0001)  # a hair under: the kernel refuses the full size

    # Sketch13 → Cut-Extrude5 (cut, two sides: drawn at the far end of the back side and taken through both)
    with BuildSketch(Plane.XY.offset(9.5).offset(-CUT_EXTRUDE5_DEPTH_BACK)):
        Polygon((0, 0), (0, 36.555345385), (-73.677801183, 31.211207192), (-63.679091017, -36.883456875), (-4.893570898, -56.018919436), (-1.96291447, -52.915871453), (0, -39.469330194), align=None)
    extrude(amount=CUT_EXTRUDE5_DEPTH + CUT_EXTRUDE5_DEPTH_BACK, mode=Mode.SUBTRACT)

    # Mirror1: part across plane


with BuildPart() as part_1:
    add(part.part)
    add(part.part.mirror(Plane(origin=(0, 0, 0), x_dir=(0, 0, 1), z_dir=(1, 0, 0))))

    # Sketch14 → Boss-Extrude4 (add)
    # profile 1 of 4: a face of its own
    with BuildSketch(Plane.XY.offset(8).offset(BOSS_EXTRUDE4_START)):
        with Locations((46.25, 7.25)):
            Circle(SKETCH14_R)
        with Locations((46.25, 7.25)):
            Circle(SKETCH14_R_2, mode=Mode.SUBTRACT)
    # profile 2 of 4: a face of its own
    with BuildSketch(Plane.XY.offset(8).offset(BOSS_EXTRUDE4_START)):
        with Locations((46.25, -7.25)):
            Circle(SKETCH14_R)
        with Locations((46.25, -7.25)):
            Circle(SKETCH14_R_2, mode=Mode.SUBTRACT)
    # profile 3 of 4: a face of its own
    with BuildSketch(Plane.XY.offset(8).offset(BOSS_EXTRUDE4_START)):
        with Locations((-46.25, -7.25)):
            Circle(SKETCH14_R)
        with Locations((-46.25, -7.25)):
            Circle(SKETCH14_R_2, mode=Mode.SUBTRACT)
    # profile 4 of 4: a face of its own
    with BuildSketch(Plane.XY.offset(8).offset(BOSS_EXTRUDE4_START)):
        with Locations((-46.25, 7.25)):
            Circle(SKETCH14_R)
        with Locations((-46.25, 7.25)):
            Circle(SKETCH14_R_2, mode=Mode.SUBTRACT)
    extrude(amount=BOSS_EXTRUDE4_DEPTH)

    # Sketch15 → Cut-Extrude6 (cut, through all)
    with BuildSketch(Plane.XY.offset(3)):
        with Locations((-48.546785533, -10.963505736)):
            Rectangle(SKETCH15_W, SKETCH15_H)
        with Locations((45.846857353, -12.98845187)):
            Rectangle(SKETCH15_W_2, SKETCH15_H_2)
    extrude(amount=CUT_EXTRUDE6_DEPTH, mode=Mode.SUBTRACT)


solid = part_1.part
